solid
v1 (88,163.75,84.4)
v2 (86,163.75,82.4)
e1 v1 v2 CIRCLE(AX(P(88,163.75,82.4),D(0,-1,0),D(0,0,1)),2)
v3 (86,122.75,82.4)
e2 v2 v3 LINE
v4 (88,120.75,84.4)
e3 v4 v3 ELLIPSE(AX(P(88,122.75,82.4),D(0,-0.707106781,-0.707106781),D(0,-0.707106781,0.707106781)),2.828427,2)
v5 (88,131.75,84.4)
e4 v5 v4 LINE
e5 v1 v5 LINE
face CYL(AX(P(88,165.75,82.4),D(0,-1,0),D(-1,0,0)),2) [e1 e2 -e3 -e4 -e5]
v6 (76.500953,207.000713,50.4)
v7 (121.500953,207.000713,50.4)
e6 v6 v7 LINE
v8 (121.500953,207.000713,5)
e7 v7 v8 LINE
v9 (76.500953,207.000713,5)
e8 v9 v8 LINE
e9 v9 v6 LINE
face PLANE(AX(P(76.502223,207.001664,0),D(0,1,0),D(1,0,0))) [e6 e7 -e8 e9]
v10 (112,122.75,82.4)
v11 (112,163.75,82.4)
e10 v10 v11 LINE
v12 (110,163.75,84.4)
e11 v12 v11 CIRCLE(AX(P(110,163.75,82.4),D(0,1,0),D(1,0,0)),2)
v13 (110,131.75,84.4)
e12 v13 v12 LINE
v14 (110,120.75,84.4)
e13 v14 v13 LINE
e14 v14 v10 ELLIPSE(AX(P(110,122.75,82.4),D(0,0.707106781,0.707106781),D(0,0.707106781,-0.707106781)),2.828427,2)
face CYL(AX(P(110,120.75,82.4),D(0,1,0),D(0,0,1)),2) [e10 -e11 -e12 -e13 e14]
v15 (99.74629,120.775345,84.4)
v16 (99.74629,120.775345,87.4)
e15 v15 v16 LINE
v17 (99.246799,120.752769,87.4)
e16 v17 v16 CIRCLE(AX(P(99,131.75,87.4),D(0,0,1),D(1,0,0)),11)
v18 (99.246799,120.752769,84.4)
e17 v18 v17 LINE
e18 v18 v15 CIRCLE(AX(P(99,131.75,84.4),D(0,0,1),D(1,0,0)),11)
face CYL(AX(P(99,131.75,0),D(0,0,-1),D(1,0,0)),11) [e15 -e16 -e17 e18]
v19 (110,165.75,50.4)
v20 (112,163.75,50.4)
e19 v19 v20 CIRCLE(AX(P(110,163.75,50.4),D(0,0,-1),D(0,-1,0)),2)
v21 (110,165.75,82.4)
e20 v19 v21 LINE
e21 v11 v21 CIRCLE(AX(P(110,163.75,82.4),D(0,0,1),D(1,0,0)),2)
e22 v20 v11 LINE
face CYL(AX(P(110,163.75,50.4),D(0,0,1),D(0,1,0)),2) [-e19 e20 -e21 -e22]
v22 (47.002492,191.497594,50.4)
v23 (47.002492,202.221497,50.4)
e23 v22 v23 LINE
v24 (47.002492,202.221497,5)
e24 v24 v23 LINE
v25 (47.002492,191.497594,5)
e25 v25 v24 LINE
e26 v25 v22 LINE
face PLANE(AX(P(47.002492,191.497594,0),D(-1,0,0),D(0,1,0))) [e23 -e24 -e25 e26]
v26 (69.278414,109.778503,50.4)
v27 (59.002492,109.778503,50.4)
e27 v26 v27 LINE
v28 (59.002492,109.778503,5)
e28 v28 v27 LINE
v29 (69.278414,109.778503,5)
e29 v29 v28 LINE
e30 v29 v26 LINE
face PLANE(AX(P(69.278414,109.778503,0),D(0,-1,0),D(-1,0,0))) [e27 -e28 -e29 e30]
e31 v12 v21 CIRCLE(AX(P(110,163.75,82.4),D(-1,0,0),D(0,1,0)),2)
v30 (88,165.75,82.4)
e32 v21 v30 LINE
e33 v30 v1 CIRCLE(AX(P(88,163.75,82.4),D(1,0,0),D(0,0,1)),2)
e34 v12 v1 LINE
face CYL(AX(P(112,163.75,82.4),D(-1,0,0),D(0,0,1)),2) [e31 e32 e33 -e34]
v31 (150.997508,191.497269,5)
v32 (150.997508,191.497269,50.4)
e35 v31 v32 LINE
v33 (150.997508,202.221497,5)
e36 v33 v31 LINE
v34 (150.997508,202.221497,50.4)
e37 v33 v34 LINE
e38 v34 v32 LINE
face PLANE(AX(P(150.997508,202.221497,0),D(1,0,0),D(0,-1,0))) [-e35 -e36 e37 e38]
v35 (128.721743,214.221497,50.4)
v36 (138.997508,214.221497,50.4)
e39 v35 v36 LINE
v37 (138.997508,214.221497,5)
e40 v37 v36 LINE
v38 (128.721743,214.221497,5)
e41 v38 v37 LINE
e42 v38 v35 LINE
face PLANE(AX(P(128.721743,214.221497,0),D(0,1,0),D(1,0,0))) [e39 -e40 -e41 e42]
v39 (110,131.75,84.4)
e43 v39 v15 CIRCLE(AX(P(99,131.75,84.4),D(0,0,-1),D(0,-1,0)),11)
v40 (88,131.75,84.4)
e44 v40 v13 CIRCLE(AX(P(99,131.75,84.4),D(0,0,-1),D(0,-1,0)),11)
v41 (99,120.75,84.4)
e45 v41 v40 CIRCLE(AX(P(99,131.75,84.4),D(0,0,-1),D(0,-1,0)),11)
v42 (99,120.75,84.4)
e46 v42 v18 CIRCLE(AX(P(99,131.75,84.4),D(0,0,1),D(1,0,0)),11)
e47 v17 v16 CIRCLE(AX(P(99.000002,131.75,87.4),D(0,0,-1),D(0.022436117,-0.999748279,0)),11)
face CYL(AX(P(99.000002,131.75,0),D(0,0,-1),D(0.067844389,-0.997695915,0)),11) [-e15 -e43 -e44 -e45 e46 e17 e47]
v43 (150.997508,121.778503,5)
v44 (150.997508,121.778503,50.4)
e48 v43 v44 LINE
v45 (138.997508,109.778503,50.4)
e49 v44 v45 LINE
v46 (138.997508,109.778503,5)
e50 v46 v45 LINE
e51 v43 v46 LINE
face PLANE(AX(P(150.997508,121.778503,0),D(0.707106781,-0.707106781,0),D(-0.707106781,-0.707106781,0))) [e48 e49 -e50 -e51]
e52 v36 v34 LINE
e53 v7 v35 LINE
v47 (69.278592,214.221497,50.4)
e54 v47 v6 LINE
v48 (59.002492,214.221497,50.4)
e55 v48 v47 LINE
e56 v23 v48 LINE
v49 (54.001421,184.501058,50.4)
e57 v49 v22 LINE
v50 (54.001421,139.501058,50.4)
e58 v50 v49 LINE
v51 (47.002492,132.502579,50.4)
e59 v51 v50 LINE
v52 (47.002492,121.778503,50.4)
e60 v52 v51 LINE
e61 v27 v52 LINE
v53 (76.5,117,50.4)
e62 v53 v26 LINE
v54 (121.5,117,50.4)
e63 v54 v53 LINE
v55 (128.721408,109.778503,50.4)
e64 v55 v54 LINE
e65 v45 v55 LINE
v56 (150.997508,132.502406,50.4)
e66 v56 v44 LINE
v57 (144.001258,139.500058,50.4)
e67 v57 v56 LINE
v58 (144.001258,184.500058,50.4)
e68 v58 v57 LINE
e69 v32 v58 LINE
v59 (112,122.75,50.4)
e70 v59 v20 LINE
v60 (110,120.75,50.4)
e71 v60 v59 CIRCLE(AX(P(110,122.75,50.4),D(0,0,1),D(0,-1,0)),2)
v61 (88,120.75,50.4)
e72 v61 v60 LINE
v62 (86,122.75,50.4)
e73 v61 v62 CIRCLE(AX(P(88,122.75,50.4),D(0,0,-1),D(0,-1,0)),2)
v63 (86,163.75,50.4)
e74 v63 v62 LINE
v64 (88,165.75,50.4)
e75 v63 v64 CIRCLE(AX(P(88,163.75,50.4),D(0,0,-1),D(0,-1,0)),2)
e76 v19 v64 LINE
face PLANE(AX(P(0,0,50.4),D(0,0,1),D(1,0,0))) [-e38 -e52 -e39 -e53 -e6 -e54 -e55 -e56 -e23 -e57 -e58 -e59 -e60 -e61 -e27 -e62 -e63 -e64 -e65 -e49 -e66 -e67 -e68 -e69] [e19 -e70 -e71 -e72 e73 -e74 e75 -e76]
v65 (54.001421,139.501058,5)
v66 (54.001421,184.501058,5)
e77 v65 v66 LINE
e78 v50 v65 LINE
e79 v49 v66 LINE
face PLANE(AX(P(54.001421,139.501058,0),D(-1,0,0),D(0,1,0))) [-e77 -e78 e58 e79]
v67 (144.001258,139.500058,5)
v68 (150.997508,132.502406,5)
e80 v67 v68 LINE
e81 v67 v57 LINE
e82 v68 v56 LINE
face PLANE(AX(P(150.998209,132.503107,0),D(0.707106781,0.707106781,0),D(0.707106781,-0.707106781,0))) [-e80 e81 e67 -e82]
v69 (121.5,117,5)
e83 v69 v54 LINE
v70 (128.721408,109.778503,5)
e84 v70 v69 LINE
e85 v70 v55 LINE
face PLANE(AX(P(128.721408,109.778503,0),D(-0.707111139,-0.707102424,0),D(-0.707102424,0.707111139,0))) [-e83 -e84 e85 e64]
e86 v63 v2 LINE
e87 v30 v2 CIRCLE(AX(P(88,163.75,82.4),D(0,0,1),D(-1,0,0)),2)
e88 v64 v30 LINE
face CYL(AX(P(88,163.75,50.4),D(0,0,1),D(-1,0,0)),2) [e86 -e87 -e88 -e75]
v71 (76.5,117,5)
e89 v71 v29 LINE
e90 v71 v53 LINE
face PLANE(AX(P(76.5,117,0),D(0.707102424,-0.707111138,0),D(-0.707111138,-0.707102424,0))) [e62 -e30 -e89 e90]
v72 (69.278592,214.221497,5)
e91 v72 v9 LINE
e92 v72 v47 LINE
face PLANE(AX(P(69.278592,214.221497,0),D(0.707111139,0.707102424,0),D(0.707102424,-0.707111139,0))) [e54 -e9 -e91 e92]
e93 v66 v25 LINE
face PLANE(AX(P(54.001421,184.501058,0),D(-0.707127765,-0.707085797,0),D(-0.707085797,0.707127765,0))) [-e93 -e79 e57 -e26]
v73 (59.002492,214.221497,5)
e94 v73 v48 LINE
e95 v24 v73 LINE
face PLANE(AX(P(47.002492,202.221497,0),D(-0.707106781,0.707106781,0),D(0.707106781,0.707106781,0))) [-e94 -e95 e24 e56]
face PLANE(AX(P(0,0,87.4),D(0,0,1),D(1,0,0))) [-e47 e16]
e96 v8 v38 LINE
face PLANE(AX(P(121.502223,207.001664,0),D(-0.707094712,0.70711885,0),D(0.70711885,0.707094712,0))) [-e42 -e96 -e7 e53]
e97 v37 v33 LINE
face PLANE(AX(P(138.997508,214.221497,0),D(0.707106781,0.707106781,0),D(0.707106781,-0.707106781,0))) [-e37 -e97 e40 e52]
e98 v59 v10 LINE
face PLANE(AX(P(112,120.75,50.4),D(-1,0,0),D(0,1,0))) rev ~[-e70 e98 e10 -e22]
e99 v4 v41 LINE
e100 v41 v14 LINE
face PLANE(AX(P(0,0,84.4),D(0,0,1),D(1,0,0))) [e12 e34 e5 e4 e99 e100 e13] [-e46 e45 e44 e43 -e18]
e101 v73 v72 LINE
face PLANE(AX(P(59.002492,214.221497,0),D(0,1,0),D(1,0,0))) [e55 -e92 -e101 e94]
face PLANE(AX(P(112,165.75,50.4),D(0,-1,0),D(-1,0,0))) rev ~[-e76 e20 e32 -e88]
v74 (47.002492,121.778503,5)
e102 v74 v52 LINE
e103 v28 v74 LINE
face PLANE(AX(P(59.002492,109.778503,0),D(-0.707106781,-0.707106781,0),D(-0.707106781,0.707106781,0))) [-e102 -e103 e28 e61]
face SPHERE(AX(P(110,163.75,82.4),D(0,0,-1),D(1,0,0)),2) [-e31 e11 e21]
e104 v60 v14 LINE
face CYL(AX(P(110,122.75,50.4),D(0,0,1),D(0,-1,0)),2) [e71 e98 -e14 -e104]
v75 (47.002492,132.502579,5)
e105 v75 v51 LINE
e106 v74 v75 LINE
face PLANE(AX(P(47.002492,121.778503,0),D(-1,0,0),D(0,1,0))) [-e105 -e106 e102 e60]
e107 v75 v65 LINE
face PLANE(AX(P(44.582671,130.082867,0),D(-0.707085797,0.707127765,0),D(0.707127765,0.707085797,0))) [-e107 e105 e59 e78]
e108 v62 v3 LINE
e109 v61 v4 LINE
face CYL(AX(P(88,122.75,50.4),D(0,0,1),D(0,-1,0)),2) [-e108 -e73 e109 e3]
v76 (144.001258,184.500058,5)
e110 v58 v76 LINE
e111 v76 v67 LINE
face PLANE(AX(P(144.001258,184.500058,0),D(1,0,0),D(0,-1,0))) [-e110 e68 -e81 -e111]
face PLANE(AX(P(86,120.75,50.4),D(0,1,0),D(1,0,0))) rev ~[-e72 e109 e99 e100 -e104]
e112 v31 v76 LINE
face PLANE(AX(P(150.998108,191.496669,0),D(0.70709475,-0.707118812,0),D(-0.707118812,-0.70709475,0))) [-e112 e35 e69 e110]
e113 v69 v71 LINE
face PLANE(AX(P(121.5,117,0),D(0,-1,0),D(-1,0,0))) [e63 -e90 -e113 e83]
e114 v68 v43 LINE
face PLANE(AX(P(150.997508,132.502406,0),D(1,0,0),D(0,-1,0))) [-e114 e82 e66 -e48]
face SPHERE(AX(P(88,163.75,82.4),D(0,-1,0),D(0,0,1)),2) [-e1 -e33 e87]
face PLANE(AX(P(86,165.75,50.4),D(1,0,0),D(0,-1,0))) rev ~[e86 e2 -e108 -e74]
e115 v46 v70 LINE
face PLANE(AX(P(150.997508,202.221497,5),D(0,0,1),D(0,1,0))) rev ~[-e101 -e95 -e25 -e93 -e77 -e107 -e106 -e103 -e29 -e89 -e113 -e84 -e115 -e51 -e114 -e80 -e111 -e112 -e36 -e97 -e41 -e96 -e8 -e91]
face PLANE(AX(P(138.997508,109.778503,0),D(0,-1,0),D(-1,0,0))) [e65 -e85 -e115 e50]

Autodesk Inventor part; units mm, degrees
ref_plane "YZ Plane" through (0, 0, 0) normal (1, 0, 0) x (0, 1, 0)
ref_plane "XZ Plane" through (0, 0, 0) normal (0, 1, 0) x (-1, 0, 0)
ref_plane "XY Plane" through (0, 0, 0) normal (0, 0, 1) x (1, 0, 0)
sketch "Sketch1" plane through (0, 0, 0) normal (0, 0, 1) x (1, 0, 0)
  line L0 (87.39809, 90.638849) -> (76.791489, 101.245451)
  line L1 (110.603697, 90.638591) -> (87.39809, 90.638849)
  line L2 (121.210063, 101.244956) -> (110.603697, 90.638591)
  line L3 (143.419374, 101.244709) -> (121.210063, 101.244956)
  line L4 (153.419263, 111.244598) -> (143.419374, 101.244709)
  line L5 (153.419473, 130.081843) -> (153.419263, 111.244598)
  line L6 (144.001258, 139.500058) -> (153.419473, 130.081843)
  line L7 (144.001258, 184.500058) -> (144.001258, 139.500058)
  line L8 (162.838724, 203.336883) -> (144.001258, 184.500058)
  line L9 (174.479779, 203.336684) -> (162.838724, 203.336883)
  line L10 (188.623093, 217.476415) -> (174.479779, 203.336684)
  line L11 (188.623904, 237.476415) -> (188.623093, 217.476415)
  line L12 (174.481567, 251.622561) -> (188.623904, 237.476415)
  line L13 (154.481567, 251.622902) -> (174.481567, 251.622561)
  line L14 (140.33919, 237.481007) -> (154.481567, 251.622902)
  line L15 (140.338992, 225.83779) -> (140.33919, 237.481007)
  line L16 (121.502223, 207.001664) -> (140.338992, 225.83779)
  line L17 (76.502223, 207.001664) -> (121.502223, 207.001664)
  line L18 (57.665842, 225.839164) -> (76.502223, 207.001664)
  line L19 (57.66604, 237.480627) -> (57.665842, 225.839164)
  line L20 (43.524145, 251.623004) -> (57.66604, 237.480627)
  line L21 (23.524145, 251.623344) -> (43.524145, 251.623004)
  line L22 (9.381769, 237.48145) -> (23.524145, 251.623344)
  line L23 (9.380958, 217.48145) -> (9.381769, 237.48145)
  line L24 (23.52252, 203.338741) -> (9.380958, 217.48145)
  line L25 (35.165328, 203.338269) -> (23.52252, 203.338741)
  line L26 (54.001421, 184.501058) -> (35.165328, 203.338269)
  line L27 (54.001421, 139.501058) -> (54.001421, 184.501058)
  line L28 (44.582671, 130.082867) -> (54.001421, 139.501058)
  line L29 (44.582461, 111.245809) -> (44.582671, 130.082867)
  line L30 (54.582226, 101.245698) -> (44.582461, 111.245809)
  line L31 (76.791489, 101.245451) -> (54.582226, 101.245698)
  circle A0 centre (99, 132) radius 5.5
  arc A1 (130.06, 142) -> (135.06, 142) centre (132.56, 142) ccw
  line L32 (130.06, 142) -> (130.06, 182)
  line L33 (135.06, 182) -> (135.06, 142)
  arc A2 (62.940969, 142) -> (67.940969, 142) centre (65.440969, 142) ccw
  arc A3 (67.940969, 182) -> (62.940969, 182) centre (65.440969, 182) ccw
  line L34 (67.940969, 182) -> (67.940969, 142)
  line L35 (138.997508, 214.221497) -> (150.997508, 202.221497)
  line L36 (128.721743, 214.221497) -> (138.997508, 214.221497)
  line L37 (121.5, 207) -> (128.721743, 214.221497)
  line L38 (76.5, 207) -> (121.5, 207)
  line L39 (69.278592, 214.221497) -> (76.5, 207)
  line L40 (59.002492, 214.221497) -> (69.278592, 214.221497)
  line L41 (47.002492, 202.221497) -> (59.002492, 214.221497)
  line L42 (47.002492, 191.497594) -> (47.002492, 202.221497)
  line L43 (54, 184.5) -> (47.002492, 191.497594)
  line L44 (54, 139.5) -> (54, 184.5)
  line L45 (47.002492, 132.502579) -> (54, 139.5)
  line L46 (47.002492, 121.778503) -> (47.002492, 132.502579)
  line L47 (59.002492, 109.778503) -> (47.002492, 121.778503)
  line L48 (69.278414, 109.778503) -> (59.002492, 109.778503)
  line L49 (76.5, 117) -> (69.278414, 109.778503)
  line L50 (121.5, 117) -> (76.5, 117)
  line L51 (128.721408, 109.778503) -> (121.5, 117)
  line L52 (138.997508, 109.778503) -> (128.721408, 109.778503)
  line L53 (150.997508, 121.778503) -> (138.997508, 109.778503)
  line L54 (150.997508, 132.502406) -> (150.997508, 121.778503)
  line L55 (144, 139.5) -> (150.997508, 132.502406)
  line L56 (144, 184.5) -> (144, 139.5)
  line L57 (150.997508, 191.497269) -> (144, 184.5)
  line L58 (150.997508, 202.221497) -> (150.997508, 191.497269)
  arc A4 (99.74629, 120.775345) -> (99.246799, 120.752769) centre (99, 131.75) ccw
  line L59 (111.585786, 133.75) -> (111, 133.75)
  line L60 (111.585786, 133.75) -> (111.585786, 135.25)
  line L61 (111.585786, 135.25) -> (113.5, 135.25)
  line L62 (113.5, 135.45) -> (113.5, 135.25)
  line L63 (113.5, 135.45) -> (113.917157, 135.45)
  line L64 (113.917157, 135.45) -> (113.917157, 141.55)
  line L65 (110.05, 169.167157) -> (103.95, 169.167157)
  line L66 (103.95, 169.167157) -> (103.95, 166.667157)
  line L67 (103.95, 166.667157) -> (94.05, 166.667157)
  line L68 (94.05, 166.667157) -> (94.05, 169.167157)
  line L69 (87.95, 169.167157) -> (87.95, 168.75)
  line L70 (87.95, 168.75) -> (87.5, 168.75)
  line L71 (86.414214, 135.25) -> (84.5, 135.25)
  line L72 (86.414214, 135.25) -> (86.414214, 133.75)
  line L73 (86.414214, 133.75) -> (87, 133.75)
  line L74 (87, 133.75) -> (87, 125.5)
  line L75 (87, 125.5) -> (89, 125.5)
  line L76 (109, 125.5) -> (111, 125.5)
  line L77 (111, 125.5) -> (111, 133.75)
  line L78 (85, 136.25) -> (86, 136.25)
  line L79 (86, 136.25) -> (86, 137.354356)
  line L80 (104.686492, 167.25) -> (104.686492, 168.25)
  line L81 (104.686492, 168.25) -> (105.854356, 168.25)
  line L82 (105.854356, 167.25) -> (104.686492, 167.25)
  circle A5 centre (99, 131.75) radius 11
  point P0 (0, 0)
  point P1 (0, 0)
extrude "Extrusion1" add sketch "Sketch1" along normal blind 5 contours L0 L31 L30 L29 L28 L46 L47 L48 L49 L50 L51 L52 L53 L54 L6 L5 L4 L3 L2 L1 | L28 L27 L26 L42 L41 L40 L39 L17 L16 L36 L35 L58 L8 L7 L6 L54 L53 L52 L51 L50 L49 L48 L47 L46 | L26 L25 L24 L23 L22 L21 L20 L19 L18 L39 L40 L41 L42 | L58 L35 L36 L16 L15 L14 L13 L12 L11 L10 L9 L8 | A0 | A5 A4
extrude "Extrusion2" add sketch "Sketch1" along normal blind 50.4 contours L28 L27 L26 L42 L41 L40 L39 L17 L16 L36 L35 L58 L8 L7 L6 L54 L53 L52 L51 L50 L49 L48 L47 L46 | A0 | A5 A4
extrude "Extrusion3" add sketch "Sketch1" along normal blind 87.4 contours A0 | A5 A4
sketch "Sketch2" plane through (0, 0, 50.4) normal (0, 0, 1) x (1, 0, 0)
  circle A0 centre (99, 131.75) radius 11 projected
  line L0 (144, 184.5) -> (144, 139.5) projected
  line L1 (99, 120.75) -> (112, 120.75)
  line L2 (112, 120.75) -> (112, 165.75)
  line L3 (112, 165.75) -> (86, 165.75)
  line L4 (86, 165.75) -> (86, 120.75)
  line L5 (86, 120.75) -> (99, 120.75)
  point P0 (0, 0)
  dimension "d6" = 13
  dimension "d7" = 45
  dimension "d8" = 26
extrude "Extrusion4" add sketch "Sketch2" along normal blind 34
fillet "Fillet1" radius 2 7 edges at (112, 165.75, 67.4) (112, 143.25, 84.4) (112, 120.75, 67.4) (86, 120.75, 67.4) (86, 143.25, 84.4) (99, 165.75, 84.4) (86, 165.75, 67.4)
sketch "Sketch3" plane through (150.997508, 191.497269, 5) normal (1, 0, 0) x (0, 0, -1)
  line L0 (0, 10.724228) -> (0, 0)
  line L1 (0, 0) -> (-45.4, 0)
  line L2 (0, 10.724228) -> (0, 62.129515)
  line L3 (0, 62.129515) -> (15.429551, 62.129515)
  line L4 (15.429551, 62.129515) -> (15.429551, -102.504069)
  line L5 (15.429551, -102.504069) -> (0, -102.504069)
  line L6 (0, -102.504069) -> (0, 10.724228)
  point P0 (5, -191.497269)
extrude "Extrusion5" cut sketch "Sketch3" along normal through all both and the other way through all
properties part number "Base_NOBOTTOMPLATE"
